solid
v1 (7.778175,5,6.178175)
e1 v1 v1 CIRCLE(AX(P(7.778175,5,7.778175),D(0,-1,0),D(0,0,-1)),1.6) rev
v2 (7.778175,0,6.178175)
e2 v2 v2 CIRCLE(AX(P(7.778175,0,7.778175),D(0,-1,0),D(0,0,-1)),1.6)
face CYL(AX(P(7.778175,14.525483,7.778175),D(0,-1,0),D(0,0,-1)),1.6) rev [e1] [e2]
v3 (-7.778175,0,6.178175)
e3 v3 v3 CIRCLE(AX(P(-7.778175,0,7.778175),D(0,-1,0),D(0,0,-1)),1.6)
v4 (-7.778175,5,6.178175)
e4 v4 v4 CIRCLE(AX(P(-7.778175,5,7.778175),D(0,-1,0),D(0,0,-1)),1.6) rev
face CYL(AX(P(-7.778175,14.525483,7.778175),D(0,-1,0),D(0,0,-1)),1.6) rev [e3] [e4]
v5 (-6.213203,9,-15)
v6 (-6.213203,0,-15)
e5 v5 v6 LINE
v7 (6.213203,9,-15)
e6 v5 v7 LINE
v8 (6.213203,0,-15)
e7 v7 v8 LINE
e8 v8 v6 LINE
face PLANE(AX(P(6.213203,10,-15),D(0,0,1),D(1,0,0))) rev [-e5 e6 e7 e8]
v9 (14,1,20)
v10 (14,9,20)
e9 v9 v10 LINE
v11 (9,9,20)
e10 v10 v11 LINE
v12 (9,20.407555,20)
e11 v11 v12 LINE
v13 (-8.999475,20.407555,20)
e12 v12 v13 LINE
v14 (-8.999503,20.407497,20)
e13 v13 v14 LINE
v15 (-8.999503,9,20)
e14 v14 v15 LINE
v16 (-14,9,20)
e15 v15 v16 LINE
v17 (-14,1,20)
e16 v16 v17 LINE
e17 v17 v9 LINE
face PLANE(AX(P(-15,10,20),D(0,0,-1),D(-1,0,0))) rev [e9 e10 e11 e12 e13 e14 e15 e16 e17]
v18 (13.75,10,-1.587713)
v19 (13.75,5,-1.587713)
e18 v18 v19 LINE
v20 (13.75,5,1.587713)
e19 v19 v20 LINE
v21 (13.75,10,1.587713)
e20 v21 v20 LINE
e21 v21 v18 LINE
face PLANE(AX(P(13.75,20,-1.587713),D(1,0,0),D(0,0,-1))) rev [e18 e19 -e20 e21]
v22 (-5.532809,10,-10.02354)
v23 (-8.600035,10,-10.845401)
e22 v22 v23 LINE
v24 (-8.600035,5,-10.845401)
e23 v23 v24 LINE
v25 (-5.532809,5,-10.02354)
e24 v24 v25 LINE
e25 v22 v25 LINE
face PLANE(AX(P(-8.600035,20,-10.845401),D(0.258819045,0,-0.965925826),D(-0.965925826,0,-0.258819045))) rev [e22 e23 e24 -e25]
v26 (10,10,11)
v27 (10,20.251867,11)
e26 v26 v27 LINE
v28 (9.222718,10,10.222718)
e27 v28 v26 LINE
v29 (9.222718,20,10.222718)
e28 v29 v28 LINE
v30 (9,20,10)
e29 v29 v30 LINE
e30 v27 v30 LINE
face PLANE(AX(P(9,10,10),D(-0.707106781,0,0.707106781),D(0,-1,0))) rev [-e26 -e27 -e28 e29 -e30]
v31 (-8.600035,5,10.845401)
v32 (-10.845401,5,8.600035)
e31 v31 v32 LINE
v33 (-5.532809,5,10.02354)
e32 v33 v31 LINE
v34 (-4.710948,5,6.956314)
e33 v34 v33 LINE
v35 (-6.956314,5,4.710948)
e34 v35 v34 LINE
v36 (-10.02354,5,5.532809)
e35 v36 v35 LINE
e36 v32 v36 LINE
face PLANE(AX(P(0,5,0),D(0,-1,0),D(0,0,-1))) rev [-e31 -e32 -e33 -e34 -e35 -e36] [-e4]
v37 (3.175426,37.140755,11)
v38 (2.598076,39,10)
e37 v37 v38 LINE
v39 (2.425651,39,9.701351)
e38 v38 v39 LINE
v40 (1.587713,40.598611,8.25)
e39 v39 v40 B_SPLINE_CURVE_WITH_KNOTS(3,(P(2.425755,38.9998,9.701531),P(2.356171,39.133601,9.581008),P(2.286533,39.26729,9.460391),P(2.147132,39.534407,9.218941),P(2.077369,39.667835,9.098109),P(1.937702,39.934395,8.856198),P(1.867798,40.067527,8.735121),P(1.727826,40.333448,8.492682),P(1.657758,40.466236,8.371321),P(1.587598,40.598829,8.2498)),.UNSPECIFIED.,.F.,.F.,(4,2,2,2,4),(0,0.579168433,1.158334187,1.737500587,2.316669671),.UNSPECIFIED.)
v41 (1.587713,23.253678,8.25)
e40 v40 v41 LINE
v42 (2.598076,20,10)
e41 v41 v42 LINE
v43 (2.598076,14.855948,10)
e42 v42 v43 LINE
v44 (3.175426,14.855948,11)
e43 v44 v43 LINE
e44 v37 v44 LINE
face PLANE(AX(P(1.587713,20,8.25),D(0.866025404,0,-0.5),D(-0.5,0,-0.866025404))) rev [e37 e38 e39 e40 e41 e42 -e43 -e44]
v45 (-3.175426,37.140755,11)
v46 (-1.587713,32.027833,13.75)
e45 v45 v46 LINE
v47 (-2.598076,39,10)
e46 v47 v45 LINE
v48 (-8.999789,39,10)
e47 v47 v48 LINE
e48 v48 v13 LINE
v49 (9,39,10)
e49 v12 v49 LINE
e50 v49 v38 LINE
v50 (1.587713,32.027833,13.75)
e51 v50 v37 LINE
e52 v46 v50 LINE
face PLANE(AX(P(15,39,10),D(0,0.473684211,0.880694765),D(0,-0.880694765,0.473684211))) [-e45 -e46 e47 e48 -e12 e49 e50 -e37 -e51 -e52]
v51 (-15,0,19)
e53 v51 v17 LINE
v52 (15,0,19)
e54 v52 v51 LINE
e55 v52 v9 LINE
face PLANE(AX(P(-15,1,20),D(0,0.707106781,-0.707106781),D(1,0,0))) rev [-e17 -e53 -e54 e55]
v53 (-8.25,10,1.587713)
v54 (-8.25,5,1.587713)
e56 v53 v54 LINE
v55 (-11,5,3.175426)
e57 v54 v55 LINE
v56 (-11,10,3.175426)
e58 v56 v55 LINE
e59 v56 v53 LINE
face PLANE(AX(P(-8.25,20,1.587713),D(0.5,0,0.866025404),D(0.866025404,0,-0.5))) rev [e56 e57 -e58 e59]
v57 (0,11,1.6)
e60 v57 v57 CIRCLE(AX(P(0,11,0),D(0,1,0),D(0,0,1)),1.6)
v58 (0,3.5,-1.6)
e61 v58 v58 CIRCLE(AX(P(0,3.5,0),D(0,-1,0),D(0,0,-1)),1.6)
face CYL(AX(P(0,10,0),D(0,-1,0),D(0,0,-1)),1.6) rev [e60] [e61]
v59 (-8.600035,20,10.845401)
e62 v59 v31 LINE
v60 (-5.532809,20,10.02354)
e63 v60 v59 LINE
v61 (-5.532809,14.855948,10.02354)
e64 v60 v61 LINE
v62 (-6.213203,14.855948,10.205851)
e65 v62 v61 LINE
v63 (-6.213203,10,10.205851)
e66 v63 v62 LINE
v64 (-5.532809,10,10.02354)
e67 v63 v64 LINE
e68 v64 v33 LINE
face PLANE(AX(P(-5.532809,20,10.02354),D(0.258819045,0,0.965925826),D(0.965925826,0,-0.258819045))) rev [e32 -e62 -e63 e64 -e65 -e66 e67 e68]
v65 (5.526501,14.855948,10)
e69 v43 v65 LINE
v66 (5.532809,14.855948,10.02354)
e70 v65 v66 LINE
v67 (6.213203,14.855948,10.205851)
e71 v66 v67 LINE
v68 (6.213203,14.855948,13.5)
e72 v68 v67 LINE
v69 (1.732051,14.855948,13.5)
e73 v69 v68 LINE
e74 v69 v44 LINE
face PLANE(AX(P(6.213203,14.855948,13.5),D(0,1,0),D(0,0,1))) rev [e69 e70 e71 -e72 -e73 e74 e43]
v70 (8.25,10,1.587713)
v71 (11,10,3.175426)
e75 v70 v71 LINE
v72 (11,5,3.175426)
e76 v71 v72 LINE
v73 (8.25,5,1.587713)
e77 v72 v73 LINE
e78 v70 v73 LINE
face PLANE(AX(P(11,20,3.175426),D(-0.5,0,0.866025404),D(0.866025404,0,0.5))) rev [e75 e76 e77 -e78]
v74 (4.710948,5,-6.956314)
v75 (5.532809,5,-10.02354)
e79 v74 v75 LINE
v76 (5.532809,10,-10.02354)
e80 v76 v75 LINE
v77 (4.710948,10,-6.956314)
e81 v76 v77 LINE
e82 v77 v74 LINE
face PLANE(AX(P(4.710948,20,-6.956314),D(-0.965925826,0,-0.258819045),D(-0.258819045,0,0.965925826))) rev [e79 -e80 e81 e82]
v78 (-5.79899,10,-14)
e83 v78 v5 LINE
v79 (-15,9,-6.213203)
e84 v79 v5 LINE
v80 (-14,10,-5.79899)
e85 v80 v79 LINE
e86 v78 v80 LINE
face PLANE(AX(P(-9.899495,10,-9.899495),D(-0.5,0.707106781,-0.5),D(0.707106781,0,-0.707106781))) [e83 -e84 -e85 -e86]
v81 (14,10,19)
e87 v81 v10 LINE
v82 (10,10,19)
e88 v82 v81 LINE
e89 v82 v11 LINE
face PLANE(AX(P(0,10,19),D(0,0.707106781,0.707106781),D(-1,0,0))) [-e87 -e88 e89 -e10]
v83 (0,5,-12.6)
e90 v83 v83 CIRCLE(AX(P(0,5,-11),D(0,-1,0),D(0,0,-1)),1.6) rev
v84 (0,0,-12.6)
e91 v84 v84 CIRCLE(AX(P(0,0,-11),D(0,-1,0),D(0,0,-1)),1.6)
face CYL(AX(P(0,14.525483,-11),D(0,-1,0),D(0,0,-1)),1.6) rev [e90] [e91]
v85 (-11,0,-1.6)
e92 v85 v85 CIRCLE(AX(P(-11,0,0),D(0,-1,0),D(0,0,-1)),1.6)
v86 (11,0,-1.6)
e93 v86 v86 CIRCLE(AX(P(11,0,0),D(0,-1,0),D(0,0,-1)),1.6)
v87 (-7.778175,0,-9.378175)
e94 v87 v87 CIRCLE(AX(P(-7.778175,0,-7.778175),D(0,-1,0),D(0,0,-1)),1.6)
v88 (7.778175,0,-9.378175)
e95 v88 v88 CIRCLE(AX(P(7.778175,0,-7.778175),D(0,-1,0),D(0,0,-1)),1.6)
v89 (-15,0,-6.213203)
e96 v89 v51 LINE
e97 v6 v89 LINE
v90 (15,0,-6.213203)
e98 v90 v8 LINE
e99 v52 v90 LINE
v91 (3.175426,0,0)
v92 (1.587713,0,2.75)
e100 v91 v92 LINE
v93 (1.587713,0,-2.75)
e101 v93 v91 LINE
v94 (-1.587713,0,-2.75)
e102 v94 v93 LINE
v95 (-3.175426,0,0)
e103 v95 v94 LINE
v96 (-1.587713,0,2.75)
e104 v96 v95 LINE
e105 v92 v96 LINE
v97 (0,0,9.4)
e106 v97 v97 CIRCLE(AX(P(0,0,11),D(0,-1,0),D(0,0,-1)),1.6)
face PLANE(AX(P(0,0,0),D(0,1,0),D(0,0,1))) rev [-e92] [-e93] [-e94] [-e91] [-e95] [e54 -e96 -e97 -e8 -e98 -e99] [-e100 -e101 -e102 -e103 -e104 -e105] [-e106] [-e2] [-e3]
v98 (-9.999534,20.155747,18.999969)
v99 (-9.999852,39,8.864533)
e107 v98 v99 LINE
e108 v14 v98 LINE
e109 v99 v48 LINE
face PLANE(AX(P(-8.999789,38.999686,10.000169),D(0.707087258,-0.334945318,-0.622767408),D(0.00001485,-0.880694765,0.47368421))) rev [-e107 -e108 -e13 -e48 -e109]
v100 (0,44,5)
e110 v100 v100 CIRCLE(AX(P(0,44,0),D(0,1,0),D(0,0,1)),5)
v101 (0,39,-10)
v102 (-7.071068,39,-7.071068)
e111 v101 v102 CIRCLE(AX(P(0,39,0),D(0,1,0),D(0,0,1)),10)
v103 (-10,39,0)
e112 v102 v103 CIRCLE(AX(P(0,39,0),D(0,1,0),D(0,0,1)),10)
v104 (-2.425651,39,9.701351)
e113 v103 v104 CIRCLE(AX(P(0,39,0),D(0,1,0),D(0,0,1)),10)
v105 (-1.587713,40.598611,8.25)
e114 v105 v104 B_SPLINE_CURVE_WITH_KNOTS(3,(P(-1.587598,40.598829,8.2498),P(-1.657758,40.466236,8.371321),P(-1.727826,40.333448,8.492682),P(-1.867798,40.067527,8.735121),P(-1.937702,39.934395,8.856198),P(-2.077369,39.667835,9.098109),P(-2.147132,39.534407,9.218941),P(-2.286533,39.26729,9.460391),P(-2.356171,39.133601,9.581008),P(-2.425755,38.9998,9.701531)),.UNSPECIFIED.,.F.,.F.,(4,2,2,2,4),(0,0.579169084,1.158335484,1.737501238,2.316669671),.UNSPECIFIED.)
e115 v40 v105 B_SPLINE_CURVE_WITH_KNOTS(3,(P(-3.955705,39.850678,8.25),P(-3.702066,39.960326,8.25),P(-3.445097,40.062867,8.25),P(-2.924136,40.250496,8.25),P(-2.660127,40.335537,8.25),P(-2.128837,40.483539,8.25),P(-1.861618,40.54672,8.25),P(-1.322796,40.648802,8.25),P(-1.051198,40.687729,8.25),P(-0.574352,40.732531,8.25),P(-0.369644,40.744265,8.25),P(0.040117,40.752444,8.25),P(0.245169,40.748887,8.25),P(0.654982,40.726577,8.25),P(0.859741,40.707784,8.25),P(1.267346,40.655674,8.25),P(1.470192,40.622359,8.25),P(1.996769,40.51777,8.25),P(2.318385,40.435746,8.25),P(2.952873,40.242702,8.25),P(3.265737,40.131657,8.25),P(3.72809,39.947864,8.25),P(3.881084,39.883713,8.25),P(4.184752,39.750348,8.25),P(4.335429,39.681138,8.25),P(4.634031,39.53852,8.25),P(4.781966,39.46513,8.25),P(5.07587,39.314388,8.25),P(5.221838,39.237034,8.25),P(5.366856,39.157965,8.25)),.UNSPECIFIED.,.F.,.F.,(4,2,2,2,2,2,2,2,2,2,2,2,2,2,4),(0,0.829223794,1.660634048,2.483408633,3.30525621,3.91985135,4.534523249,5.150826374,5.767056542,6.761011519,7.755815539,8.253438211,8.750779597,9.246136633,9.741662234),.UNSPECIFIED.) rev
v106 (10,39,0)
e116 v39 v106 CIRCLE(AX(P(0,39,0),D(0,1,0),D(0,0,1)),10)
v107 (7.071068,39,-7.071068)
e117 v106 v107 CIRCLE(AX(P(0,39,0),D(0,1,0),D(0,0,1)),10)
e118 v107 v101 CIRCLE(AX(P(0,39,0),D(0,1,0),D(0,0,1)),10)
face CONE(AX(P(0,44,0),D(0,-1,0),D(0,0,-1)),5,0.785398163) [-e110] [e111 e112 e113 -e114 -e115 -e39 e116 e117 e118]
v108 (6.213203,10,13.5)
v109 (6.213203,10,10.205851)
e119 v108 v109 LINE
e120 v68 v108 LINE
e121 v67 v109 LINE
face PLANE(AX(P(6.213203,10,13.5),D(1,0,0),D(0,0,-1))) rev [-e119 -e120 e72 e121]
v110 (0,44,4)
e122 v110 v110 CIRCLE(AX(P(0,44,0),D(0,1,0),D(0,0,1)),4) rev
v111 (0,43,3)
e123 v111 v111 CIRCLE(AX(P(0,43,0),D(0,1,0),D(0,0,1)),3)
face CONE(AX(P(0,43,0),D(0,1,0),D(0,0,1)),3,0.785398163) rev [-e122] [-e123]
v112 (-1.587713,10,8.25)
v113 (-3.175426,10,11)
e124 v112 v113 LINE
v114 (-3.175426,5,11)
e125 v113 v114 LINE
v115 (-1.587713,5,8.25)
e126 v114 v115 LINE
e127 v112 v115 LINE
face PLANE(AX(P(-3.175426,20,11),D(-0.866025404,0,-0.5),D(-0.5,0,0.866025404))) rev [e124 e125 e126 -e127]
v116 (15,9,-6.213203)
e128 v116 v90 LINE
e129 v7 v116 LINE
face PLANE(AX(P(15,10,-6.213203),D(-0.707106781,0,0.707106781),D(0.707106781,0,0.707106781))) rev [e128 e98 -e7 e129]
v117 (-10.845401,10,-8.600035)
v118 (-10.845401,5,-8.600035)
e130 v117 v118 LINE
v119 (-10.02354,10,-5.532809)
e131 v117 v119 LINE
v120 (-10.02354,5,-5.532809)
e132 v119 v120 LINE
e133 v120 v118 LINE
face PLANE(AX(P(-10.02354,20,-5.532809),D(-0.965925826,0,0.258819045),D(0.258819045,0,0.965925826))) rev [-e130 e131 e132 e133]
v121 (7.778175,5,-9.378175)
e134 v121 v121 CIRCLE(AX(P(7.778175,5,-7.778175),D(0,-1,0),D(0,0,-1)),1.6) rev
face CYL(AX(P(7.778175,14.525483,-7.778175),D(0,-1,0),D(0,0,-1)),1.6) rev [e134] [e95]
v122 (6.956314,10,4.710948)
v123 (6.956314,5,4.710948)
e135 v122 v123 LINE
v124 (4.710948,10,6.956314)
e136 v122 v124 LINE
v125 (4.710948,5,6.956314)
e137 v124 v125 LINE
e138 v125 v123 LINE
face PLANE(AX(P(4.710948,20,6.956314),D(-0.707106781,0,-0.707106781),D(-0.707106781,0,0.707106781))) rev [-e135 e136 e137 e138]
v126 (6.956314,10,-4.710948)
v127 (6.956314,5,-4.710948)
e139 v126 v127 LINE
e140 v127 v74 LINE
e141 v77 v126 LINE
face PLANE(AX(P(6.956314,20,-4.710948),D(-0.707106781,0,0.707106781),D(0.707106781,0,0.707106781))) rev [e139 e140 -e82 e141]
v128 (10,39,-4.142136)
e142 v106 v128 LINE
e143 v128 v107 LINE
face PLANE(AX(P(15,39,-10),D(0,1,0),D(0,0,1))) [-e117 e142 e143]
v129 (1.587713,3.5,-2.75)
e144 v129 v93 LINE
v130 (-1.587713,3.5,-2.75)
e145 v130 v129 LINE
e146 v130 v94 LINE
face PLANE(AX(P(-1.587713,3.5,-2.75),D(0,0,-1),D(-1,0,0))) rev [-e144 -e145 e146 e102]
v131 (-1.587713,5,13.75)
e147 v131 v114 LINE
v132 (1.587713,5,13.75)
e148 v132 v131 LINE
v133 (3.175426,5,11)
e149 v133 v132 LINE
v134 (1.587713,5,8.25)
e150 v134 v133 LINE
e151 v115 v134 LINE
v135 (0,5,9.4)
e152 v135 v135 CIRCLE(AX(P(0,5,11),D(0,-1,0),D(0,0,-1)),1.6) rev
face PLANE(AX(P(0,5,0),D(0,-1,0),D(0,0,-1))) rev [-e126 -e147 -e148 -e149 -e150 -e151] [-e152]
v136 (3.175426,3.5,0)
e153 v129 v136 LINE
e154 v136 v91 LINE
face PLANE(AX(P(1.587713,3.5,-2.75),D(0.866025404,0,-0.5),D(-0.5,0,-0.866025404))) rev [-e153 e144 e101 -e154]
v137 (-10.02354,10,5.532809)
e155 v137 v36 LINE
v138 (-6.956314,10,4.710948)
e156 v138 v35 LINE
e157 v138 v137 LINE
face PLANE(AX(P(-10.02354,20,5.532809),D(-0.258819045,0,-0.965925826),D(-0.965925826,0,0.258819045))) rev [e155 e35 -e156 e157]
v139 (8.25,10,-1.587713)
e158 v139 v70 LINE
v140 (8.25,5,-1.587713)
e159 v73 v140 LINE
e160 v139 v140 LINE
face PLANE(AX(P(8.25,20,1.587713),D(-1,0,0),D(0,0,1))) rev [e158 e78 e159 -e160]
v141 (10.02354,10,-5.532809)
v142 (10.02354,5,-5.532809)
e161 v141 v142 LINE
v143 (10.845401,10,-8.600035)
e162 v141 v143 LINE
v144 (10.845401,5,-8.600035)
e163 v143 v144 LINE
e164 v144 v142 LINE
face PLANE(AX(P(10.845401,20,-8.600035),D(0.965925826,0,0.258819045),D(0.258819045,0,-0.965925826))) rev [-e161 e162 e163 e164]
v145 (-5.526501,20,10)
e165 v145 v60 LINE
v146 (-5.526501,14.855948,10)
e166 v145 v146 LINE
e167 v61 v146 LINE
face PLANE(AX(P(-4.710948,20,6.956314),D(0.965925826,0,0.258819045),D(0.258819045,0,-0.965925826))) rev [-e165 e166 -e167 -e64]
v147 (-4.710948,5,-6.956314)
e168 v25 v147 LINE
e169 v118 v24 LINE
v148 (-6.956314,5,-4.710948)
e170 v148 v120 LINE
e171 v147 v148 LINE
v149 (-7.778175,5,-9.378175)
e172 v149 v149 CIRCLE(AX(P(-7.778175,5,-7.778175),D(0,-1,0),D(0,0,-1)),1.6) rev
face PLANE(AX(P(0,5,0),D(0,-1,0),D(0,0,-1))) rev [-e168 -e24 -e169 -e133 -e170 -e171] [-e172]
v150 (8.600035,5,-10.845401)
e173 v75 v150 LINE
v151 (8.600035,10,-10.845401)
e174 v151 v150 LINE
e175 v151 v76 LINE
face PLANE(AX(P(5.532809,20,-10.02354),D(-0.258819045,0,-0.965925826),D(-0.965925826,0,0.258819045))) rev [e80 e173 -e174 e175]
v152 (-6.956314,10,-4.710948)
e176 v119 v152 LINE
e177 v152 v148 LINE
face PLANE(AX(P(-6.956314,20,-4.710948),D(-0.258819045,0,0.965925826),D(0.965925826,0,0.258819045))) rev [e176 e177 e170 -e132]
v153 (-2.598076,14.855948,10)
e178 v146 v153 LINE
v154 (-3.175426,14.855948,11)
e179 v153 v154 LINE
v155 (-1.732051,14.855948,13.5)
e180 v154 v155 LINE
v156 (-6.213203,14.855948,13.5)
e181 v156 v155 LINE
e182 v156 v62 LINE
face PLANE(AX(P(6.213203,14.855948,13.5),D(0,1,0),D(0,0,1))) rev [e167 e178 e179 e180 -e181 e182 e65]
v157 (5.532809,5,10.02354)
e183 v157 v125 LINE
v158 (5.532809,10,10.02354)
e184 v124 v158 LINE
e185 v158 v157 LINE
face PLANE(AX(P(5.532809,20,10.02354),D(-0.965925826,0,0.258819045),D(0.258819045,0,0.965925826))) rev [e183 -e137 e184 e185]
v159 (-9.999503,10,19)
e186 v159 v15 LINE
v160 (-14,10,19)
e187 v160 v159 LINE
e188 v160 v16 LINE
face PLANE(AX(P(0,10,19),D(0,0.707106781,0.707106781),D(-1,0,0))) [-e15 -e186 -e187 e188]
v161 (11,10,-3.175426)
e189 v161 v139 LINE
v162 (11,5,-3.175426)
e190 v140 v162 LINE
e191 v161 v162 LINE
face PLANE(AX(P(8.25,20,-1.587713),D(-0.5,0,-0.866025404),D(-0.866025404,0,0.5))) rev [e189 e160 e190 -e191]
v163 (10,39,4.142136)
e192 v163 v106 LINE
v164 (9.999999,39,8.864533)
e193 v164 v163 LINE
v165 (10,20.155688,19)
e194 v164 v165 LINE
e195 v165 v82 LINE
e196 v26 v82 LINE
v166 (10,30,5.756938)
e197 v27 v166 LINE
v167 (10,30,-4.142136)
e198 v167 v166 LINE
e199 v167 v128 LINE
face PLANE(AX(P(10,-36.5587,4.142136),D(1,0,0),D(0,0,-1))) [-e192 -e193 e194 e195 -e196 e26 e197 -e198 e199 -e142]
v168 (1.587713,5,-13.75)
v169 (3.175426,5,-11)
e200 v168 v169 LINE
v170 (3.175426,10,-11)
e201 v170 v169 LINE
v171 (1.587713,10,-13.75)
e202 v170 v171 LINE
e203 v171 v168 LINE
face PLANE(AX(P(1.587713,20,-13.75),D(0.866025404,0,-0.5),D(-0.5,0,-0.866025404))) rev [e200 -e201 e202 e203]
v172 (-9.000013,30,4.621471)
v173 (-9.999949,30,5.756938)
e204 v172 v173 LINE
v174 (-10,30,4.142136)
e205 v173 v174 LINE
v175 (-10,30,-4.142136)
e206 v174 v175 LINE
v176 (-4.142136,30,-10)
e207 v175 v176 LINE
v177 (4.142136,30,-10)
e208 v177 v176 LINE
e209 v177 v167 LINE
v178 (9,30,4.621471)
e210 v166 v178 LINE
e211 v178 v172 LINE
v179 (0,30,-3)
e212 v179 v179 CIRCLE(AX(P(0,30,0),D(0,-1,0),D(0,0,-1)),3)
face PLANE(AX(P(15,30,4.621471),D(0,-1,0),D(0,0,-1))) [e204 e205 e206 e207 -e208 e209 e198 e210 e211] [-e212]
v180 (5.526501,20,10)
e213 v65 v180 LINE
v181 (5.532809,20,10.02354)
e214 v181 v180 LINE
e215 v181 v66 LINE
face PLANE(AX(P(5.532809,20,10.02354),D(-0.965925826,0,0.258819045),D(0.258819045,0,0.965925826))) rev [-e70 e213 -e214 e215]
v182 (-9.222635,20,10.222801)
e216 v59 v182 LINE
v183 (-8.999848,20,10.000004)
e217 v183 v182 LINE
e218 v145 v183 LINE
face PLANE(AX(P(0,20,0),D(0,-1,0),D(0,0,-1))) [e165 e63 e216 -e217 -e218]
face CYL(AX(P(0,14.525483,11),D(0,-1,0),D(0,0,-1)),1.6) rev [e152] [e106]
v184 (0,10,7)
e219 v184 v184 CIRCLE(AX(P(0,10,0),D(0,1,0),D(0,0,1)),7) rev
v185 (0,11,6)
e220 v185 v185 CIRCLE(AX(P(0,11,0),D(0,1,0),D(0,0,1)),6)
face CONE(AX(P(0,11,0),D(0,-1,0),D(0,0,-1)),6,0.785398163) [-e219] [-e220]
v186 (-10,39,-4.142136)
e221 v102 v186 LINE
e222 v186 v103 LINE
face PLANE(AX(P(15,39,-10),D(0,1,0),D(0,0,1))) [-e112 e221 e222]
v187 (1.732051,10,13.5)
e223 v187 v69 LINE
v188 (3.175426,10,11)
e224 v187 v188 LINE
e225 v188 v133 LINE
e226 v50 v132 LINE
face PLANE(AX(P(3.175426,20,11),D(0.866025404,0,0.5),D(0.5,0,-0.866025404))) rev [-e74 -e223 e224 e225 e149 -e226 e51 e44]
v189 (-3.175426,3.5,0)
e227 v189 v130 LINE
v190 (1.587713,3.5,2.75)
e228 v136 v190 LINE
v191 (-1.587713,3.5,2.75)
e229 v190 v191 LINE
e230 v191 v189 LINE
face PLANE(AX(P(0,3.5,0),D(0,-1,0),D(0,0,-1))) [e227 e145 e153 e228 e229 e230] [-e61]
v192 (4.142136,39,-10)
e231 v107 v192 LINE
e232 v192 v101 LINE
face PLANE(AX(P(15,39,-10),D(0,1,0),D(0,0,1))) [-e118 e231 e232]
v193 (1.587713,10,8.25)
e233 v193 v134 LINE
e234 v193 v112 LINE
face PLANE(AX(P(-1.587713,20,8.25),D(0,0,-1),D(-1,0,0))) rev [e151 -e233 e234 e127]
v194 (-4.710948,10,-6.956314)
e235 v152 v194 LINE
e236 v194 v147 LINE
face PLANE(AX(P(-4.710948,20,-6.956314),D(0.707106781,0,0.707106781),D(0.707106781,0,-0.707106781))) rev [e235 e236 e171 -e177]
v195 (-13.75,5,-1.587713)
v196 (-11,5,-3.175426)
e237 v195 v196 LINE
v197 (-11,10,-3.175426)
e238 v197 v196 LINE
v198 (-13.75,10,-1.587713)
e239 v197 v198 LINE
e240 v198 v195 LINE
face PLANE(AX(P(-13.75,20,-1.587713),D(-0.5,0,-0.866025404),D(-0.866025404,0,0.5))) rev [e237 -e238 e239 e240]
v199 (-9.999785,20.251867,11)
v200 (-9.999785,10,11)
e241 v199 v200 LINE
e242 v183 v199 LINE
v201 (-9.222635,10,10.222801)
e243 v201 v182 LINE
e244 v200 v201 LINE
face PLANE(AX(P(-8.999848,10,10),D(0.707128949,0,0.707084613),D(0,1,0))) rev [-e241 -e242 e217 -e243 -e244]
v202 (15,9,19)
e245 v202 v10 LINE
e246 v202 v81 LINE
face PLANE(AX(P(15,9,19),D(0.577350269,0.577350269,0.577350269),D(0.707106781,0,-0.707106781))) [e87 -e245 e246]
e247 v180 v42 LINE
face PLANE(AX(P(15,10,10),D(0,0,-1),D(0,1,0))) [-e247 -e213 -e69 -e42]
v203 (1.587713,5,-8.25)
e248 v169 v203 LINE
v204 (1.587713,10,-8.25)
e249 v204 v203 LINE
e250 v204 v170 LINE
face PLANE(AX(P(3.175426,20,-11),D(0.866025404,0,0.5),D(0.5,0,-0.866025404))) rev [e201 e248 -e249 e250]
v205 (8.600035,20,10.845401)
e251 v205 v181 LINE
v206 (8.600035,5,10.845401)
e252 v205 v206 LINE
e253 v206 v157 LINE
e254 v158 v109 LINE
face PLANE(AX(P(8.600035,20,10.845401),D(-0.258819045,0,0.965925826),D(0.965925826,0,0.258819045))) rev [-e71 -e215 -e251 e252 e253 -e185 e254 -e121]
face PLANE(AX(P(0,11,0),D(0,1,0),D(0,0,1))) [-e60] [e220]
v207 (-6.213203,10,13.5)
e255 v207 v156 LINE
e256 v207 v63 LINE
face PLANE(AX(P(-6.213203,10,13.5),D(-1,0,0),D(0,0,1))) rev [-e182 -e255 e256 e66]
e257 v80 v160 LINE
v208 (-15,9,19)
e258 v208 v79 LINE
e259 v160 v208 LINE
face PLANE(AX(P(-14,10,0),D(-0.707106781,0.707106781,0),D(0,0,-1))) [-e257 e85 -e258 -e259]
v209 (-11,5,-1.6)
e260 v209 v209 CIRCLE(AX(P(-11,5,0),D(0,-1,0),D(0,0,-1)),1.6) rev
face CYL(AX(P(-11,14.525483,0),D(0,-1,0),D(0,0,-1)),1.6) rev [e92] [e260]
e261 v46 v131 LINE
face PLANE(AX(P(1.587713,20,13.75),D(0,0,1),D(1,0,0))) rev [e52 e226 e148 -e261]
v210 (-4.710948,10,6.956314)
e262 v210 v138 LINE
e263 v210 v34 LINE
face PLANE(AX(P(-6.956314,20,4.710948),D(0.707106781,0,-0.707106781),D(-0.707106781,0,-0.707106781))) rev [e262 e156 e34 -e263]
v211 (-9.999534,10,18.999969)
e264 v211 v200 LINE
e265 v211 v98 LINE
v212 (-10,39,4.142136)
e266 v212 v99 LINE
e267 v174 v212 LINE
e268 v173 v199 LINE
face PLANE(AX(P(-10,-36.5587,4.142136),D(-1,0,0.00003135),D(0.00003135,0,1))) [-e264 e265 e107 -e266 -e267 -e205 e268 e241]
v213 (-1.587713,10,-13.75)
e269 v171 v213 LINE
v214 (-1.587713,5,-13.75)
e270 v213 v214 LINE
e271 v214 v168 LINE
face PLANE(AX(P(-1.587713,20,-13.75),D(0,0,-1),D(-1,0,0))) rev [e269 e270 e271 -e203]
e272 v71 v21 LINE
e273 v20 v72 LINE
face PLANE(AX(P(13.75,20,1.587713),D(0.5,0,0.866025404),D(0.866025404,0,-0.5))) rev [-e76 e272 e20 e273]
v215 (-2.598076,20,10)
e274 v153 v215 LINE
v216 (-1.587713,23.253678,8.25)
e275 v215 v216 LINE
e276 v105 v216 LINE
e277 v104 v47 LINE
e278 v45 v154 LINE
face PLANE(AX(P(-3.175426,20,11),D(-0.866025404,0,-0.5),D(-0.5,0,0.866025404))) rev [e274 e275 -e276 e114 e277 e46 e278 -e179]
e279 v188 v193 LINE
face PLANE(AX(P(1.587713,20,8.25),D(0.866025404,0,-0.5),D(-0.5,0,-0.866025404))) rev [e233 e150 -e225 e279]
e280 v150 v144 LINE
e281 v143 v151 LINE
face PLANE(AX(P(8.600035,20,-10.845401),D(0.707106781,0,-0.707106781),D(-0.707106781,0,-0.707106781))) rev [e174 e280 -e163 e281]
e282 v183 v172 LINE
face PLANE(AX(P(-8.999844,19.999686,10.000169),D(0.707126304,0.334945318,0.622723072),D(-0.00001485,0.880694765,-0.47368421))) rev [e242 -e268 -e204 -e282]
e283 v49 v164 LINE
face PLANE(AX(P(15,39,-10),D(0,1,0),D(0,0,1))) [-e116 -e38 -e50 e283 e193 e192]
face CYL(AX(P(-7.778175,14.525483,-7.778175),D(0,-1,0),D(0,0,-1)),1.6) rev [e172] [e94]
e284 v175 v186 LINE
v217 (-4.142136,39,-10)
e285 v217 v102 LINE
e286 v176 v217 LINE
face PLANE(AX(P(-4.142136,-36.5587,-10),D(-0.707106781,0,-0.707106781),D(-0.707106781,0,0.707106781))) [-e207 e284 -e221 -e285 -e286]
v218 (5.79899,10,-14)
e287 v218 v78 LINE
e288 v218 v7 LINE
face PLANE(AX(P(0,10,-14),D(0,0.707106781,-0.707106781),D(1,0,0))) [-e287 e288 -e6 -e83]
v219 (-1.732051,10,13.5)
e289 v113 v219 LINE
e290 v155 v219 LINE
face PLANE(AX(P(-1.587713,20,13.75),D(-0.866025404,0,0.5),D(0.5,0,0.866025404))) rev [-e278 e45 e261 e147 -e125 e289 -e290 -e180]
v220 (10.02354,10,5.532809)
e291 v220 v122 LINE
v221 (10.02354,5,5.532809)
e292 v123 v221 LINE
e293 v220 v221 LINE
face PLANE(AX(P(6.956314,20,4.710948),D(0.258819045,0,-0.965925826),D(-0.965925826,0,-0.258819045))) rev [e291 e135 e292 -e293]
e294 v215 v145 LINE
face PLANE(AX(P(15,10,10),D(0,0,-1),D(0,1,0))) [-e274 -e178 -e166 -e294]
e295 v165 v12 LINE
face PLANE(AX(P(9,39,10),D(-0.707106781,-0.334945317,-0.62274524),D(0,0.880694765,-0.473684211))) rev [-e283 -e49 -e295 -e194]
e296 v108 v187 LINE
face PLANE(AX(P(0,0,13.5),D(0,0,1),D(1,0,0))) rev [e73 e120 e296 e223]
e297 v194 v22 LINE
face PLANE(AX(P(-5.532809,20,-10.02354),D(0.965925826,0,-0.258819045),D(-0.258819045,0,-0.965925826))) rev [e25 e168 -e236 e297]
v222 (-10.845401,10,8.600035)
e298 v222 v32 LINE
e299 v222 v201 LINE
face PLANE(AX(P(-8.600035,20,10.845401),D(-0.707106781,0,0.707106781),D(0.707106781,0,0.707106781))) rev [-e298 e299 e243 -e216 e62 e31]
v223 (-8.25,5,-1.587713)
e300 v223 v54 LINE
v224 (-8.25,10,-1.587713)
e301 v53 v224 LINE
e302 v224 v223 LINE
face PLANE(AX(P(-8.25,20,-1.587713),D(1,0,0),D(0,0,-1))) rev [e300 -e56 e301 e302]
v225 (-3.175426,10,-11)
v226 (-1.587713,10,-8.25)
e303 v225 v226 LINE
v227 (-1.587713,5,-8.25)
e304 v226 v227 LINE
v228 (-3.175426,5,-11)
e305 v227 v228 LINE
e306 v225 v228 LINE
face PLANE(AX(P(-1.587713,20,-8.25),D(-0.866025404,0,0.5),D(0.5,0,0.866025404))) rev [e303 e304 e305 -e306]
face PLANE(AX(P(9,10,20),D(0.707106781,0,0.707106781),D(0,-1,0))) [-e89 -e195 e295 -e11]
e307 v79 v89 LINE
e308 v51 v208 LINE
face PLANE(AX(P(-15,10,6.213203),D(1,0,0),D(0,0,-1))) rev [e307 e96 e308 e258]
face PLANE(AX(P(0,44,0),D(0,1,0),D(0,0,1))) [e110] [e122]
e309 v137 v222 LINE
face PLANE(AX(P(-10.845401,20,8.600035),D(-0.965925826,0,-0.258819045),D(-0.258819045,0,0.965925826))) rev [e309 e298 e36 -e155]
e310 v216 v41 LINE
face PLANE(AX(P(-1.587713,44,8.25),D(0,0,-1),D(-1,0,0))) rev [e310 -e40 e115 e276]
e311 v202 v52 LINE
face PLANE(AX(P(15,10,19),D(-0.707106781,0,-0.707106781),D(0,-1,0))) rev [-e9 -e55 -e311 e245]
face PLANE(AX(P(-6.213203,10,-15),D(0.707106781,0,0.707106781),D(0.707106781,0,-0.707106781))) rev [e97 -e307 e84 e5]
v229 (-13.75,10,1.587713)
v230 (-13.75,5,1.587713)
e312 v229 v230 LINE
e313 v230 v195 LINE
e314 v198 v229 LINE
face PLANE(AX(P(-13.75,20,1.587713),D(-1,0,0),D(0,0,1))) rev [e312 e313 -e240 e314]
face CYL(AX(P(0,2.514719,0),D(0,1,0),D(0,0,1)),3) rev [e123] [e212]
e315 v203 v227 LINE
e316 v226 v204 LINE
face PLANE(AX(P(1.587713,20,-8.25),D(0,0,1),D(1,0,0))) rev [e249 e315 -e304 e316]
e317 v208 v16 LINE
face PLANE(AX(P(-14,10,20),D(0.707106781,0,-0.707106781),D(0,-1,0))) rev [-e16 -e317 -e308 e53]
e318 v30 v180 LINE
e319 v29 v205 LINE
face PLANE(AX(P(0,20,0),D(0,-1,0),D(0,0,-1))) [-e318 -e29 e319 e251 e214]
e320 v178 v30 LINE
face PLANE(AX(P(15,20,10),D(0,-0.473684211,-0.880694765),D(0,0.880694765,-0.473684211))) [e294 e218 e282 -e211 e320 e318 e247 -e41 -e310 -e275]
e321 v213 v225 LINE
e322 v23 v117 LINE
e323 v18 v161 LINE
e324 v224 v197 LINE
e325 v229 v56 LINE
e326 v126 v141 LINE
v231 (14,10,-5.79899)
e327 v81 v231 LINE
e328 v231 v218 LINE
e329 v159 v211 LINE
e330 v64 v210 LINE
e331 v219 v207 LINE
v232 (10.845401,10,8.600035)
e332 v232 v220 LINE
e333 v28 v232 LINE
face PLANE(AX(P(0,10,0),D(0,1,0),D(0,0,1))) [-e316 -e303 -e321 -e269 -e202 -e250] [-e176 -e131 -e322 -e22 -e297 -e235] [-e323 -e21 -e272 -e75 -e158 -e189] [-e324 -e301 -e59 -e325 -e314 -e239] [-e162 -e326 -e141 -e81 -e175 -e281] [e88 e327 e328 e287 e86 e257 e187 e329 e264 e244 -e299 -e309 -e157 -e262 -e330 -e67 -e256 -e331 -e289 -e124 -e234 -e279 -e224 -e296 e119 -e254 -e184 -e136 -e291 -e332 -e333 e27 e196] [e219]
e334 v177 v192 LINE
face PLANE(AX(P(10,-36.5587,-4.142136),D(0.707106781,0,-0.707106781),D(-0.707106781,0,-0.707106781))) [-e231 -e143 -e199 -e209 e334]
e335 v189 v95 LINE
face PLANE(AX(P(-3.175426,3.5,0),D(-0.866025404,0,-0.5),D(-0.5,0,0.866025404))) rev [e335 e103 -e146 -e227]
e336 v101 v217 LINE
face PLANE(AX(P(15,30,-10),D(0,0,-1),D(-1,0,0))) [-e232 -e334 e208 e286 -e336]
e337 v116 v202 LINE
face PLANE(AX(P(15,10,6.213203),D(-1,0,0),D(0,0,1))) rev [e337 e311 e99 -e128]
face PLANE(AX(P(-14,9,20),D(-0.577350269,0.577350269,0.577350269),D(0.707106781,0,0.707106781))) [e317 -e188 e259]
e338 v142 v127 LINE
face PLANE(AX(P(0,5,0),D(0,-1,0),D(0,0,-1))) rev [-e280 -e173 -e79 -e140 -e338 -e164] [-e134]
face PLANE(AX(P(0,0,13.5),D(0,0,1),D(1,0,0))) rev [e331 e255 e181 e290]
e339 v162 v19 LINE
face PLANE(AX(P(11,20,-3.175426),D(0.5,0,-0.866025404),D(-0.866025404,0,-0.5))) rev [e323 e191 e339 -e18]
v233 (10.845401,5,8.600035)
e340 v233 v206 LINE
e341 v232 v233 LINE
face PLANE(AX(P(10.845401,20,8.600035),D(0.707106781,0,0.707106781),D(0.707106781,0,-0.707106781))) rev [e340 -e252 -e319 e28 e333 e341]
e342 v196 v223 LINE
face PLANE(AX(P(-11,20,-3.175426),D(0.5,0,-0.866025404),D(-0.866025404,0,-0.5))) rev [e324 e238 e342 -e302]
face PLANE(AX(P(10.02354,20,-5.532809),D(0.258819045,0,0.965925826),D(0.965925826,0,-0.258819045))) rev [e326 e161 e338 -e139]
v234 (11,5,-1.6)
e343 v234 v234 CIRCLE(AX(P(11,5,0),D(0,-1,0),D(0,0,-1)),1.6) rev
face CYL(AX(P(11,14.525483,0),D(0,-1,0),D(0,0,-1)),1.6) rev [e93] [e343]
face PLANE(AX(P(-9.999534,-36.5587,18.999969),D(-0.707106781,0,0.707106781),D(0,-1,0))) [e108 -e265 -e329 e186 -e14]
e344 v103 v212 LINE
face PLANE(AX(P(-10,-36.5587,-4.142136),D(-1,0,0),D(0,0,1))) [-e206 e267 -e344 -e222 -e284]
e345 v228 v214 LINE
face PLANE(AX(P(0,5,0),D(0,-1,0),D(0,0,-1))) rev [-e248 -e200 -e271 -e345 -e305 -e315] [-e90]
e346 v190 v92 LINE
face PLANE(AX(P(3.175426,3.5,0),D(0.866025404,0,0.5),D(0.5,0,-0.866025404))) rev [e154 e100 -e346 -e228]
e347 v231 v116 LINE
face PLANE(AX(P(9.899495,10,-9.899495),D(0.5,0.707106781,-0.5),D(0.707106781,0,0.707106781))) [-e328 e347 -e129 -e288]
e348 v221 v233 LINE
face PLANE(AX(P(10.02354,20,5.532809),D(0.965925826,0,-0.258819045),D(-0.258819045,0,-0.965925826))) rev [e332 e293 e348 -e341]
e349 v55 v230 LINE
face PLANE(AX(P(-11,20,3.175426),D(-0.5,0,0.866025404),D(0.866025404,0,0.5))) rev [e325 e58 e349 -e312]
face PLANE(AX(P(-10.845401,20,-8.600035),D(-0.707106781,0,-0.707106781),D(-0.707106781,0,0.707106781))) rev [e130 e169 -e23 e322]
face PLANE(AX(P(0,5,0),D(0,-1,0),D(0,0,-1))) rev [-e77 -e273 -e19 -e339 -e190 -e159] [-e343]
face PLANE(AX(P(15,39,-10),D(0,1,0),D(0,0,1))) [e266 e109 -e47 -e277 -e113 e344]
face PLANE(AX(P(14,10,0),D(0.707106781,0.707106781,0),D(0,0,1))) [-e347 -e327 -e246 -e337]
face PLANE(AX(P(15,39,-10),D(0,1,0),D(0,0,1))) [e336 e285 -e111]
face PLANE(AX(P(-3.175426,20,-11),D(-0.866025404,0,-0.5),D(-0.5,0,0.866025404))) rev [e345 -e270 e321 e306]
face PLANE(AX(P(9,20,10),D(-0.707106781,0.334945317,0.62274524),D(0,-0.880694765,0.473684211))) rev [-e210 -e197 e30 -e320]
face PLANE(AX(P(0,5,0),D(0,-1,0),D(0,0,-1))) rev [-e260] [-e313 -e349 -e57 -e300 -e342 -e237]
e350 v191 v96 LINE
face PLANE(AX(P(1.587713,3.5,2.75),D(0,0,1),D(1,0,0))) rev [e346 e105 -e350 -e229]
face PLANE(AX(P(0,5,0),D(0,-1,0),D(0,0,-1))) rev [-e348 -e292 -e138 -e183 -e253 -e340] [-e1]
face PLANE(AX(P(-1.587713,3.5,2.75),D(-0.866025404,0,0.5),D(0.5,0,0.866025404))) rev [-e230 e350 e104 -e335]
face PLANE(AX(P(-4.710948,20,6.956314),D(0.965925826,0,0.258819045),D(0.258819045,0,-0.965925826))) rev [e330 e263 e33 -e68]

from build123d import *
from OCP.BRepFilletAPI import BRepFilletAPI_MakeChamfer

# Parameters (mm, degrees)
CROQUIS1_R              = 1.6
SALIENTE_EXTRUIR1_DEPTH = 10
SALIENTE_EXTRUIR2_DEPTH = 30
CROQUIS12_W             = 12.426406872
CROQUIS12_H             = 4.855948251
CORTAR_EXTRUIR7_DEPTH   = 3.5
CROQUIS3_OUTSIDE_W      = 44.076
CROQUIS3_OUTSIDE_H      = 49.076
CROQUIS3_OUTSIDE_R      = 1.6
CORTAR_EXTRUIR1_DEPTH   = 29
CROQUIS4_R              = 10
SALIENTE_EXTRUIR3_DEPTH = 5
CHAFL_N1_SIZE           = 5
CROQUIS6_R              = 1.6
CORTAR_EXTRUIR3_DEPTH   = 10
CROQUIS8_R              = 6
CROQUIS8_R_2            = 1.6
SALIENTE_EXTRUIR4_DEPTH = 1
CHAFL_N2_SIZE           = 1
CROQUIS5_R              = 3
CORTAR_EXTRUIR4_DEPTH   = 33
CHAFL_N3_SIZE           = 1
CHAFL_N3_SIZE2          = 1.000027611
CHAFL_N3_SIZE2_2        = 1.000000257
CHAFL_N3_SIZE2_3        = 0.999999743
CHAFL_N3_SIZE2_4        = 0.999999708
CHAFL_N3_SIZE2_5        = 1.000000292
CHAFL_N3_SIZE2_6        = 0.999968652
CHAFL_N3_SIZE2_7        = 0.999972392
CHAFL_N3_SIZE2_8        = 1.000031351
CORTAR_EXTRUIR5_START   = -5
CORTAR_EXTRUIR5_DEPTH   = 15
CORTAR_EXTRUIR8_DEPTH   = 48.759815826
CHAFL_N4_SIZE           = 1
CORTAR_EXTRUIR6_DEPTH   = 3.5


with BuildPart() as part:
    # Croquis1 → Saliente-Extruir1 (new body)
    with BuildSketch(Plane(origin=(0, 0, 0), x_dir=(1, 0, 0), z_dir=(0, 1, 0))):
        Polygon((-15, -6.213203436), (-15, -20), (15, -20), (15, -6.213203436), (15, 6.213203436), (6.213203436, 15), (-6.213203436, 15), (-15, 6.213203436), align=None)
        with Locations(Location((0, 0, 0), (0, 0, 270))):
            Circle(CROQUIS1_R, mode=Mode.SUBTRACT)
    extrude(amount=SALIENTE_EXTRUIR1_DEPTH)

    # Croquis2 → Saliente-Extruir2 (add)
    with BuildSketch(Plane.ZY.offset(15)):
        Polygon((10, 20), (4.621471258, 30), (-10, 30), (-10, 39), (10, 39), (20, 20.407554966), (20, 10), (10, 10), align=None)
    extrude(amount=-SALIENTE_EXTRUIR2_DEPTH)

    # Croquis12 → Cortar-Extruir7 (cut)
    with BuildSketch(Plane(origin=(0, 0, 10), x_dir=(-1, 0, 0), z_dir=(0, 0, -1))):
        with Locations((0, 12.427974126)):
            Rectangle(CROQUIS12_W, CROQUIS12_H)
    extrude(amount=-CORTAR_EXTRUIR7_DEPTH, mode=Mode.SUBTRACT)

    # Croquis3 outside → Cortar-Extruir1 (cut)
    # profile 1 of 2: a face of its own
    with BuildSketch(Plane(origin=(0, 39, 0), x_dir=(1, 0, 0), z_dir=(0, 1, 0))):
        with Locations((0, -2.5)):
            Rectangle(CROQUIS3_OUTSIDE_W, CROQUIS3_OUTSIDE_H)
        Polygon((-10, -4.142135624), (-9.999502859, -20), (9.999995364, -20), (10, -4.142135624), (10, 4.142135624), (4.142135624, 10), (-4.142135624, 10), (-10, 4.142135624), align=None, mode=Mode.SUBTRACT)
    # profile 2 of 2: a face of its own
    with BuildSketch(Plane(origin=(0, 39, 0), x_dir=(1, 0, 0), z_dir=(0, 1, 0))):
        with Locations(Location((0, 0, 0), (0, 0, 270))):
            Circle(CROQUIS3_OUTSIDE_R)
    extrude(amount=-CORTAR_EXTRUIR1_DEPTH, mode=Mode.SUBTRACT)

    # Croquis4 → Saliente-Extruir3 (add)
    with BuildSketch(Plane(origin=(0, 39, 0), x_dir=(1, 0, 0), z_dir=(0, 1, 0))):
        with Locations(Location((0, 0, 0), (0, 0, 270))):
            Circle(CROQUIS4_R)
    extrude(amount=SALIENTE_EXTRUIR3_DEPTH)

    # Chaflán1
    chafl_n1_edges = [part.edges().sort_by_distance(p)[0] for p in [
        (0, 44, -10),
    ]]
    chamfer(chafl_n1_edges, length=CHAFL_N1_SIZE - 0.0001)  # a hair under: the kernel refuses the full size

    # Croquis6 → Cortar-Extruir3 (cut)
    with BuildSketch(Plane.XZ):
        with Locations(Location((0, 11, 0), (0, 0, 270))):
            Circle(CROQUIS6_R)
        with Locations(Location((7.778174593, 7.778174593, 0), (0, 0, 270))):
            Circle(CROQUIS6_R)
        with Locations(Location((11, 0, 0), (0, 0, 270))):
            Circle(CROQUIS6_R)
        with Locations(Location((7.778174593, -7.778174593, 0), (0, 0, 270))):
            Circle(CROQUIS6_R)
        with Locations(Location((0, -11, 0), (0, 0, 270))):
            Circle(CROQUIS6_R)
        with Locations(Location((-7.778174593, -7.778174593, 0), (0, 0, 270))):
            Circle(CROQUIS6_R)
        with Locations(Location((-11, 0, 0), (0, 0, 270))):
            Circle(CROQUIS6_R)
        with Locations(Location((-7.778174593, 7.778174593, 0), (0, 0, 270))):
            Circle(CROQUIS6_R)
    extrude(amount=-CORTAR_EXTRUIR3_DEPTH, mode=Mode.SUBTRACT)

    # Croquis8 → Saliente-Extruir4 (add)
    with BuildSketch(Plane(origin=(0, 10, 0), x_dir=(1, 0, 0), z_dir=(0, 1, 0))):
        with Locations(Location((0, 0, 0), (0, 0, 270))):
            Circle(CROQUIS8_R)
        with Locations(Location((0, 0, 0), (0, 0, 270))):
            Circle(CROQUIS8_R_2, mode=Mode.SUBTRACT)
    extrude(amount=SALIENTE_EXTRUIR4_DEPTH)

    # Chaflán2
    chafl_n2_edges = [part.edges().sort_by_distance(p)[0] for p in [
        (0, 10, -6),
    ]]
    chamfer(chafl_n2_edges, length=CHAFL_N2_SIZE - 0.0001)  # a hair under: the kernel refuses the full size

    # Croquis5 → Cortar-Extruir4 (cut)
    with BuildSketch(Plane(origin=(0, 44, 0), x_dir=(1, 0, 0), z_dir=(0, 1, 0))):
        with Locations(Location((0, 0, 0), (0, 0, 270))):
            Circle(CROQUIS5_R)
    extrude(amount=-CORTAR_EXTRUIR4_DEPTH, mode=Mode.SUBTRACT)

    # Chaflán3: one chamfer whose edges measure the first distance from different faces: ONE call of the kernel's chamfer builder (chamfer() names one face for all edges)
    chafl_n3_edges_1 = [part.edges().sort_by_distance(p)[0] for p in [
        (10.606601718, 10, -10.606601718),
        (0, 10, -15),
        (-10.606601718, 10, -10.606601718),
        (-15, 10, 6.893398282),
        (15, 10, 6.893398282),
        (15, 5, 20),
        (-15, 5, 20),
        (0, 0, 20),
        (-12.499751429, 10, 20),
        (12.499997682, 10, 20),
    ]]
    chafl_n3_edges_2 = [part.edges().sort_by_distance(p)[0] for p in [
        (-9.999659608, 29.703777483, 15),
    ]]
    chafl_n3_side_2 = [part.faces().sort_by_distance(p)[0] for p in [
        (-9.999745235, 23.826424788, 12.268639946),
    ]]
    chafl_n3_edges_3 = [part.edges().sort_by_distance(p)[0] for p in [
        (9.999996825, 29.703777483, 15),
    ]]
    chafl_n3_side_3 = [part.faces().sort_by_distance(p)[0] for p in [
        (9.999997624, 23.826424788, 12.268639946),
    ]]
    chafl_n3_edges_4 = [part.edges().sort_by_distance(p)[0] for p in [
        (9.999999074, 25, 7.310735629),
    ]]
    chafl_n3_side_4 = [part.faces().sort_by_distance(p)[0] for p in [
        (9.999997624, 23.826424788, 12.268639946),
    ]]
    chafl_n3_edges_5 = [part.edges().sort_by_distance(p)[0] for p in [
        (9.999998287, 15, 10),
    ]]
    chafl_n3_side_5 = [part.faces().sort_by_distance(p)[0] for p in [
        (0.000130269, 16.111309081, 10),
    ]]
    chafl_n3_edges_6 = [part.edges().sort_by_distance(p)[0] for p in [
        (9.999995364, 15.203777483, 20),
    ]]
    chafl_n3_side_6 = [part.faces().sort_by_distance(p)[0] for p in [
        (0.00010087, 9.179654523, 20),
    ]]
    chafl_n3_edges_7 = [part.edges().sort_by_distance(p)[0] for p in [
        (-9.999816357, 15, 10),
    ]]
    chafl_n3_side_7 = [part.faces().sort_by_distance(p)[0] for p in [
        (-9.999745235, 23.826424788, 12.268639946),
    ]]
    chafl_n3_edges_8 = [part.edges().sort_by_distance(p)[0] for p in [
        (-9.999900665, 25, 7.310735629),
    ]]
    chafl_n3_side_8 = [part.faces().sort_by_distance(p)[0] for p in [
        (-9.999745235, 23.826424788, 12.268639946),
    ]]
    chafl_n3_edges_9 = [part.edges().sort_by_distance(p)[0] for p in [
        (-9.999502859, 15.203777483, 20),
    ]]
    chafl_n3_side_9 = [part.faces().sort_by_distance(p)[0] for p in [
        (-9.999745235, 23.826424788, 12.268639946),
    ]]
    chafl_n3 = BRepFilletAPI_MakeChamfer(part.part.solid().wrapped)
    for e in chafl_n3_edges_1:
        chafl_n3.Add(CHAFL_N3_SIZE, e.wrapped)
    for e in chafl_n3_edges_2:
        chafl_n3.Add(CHAFL_N3_SIZE, CHAFL_N3_SIZE2, e.wrapped, chafl_n3_side_2[0].wrapped)  # the first distance lies on this face
    for e in chafl_n3_edges_3:
        chafl_n3.Add(CHAFL_N3_SIZE, CHAFL_N3_SIZE2_2, e.wrapped, chafl_n3_side_3[0].wrapped)  # the first distance lies on this face
    for e in chafl_n3_edges_4:
        chafl_n3.Add(CHAFL_N3_SIZE, CHAFL_N3_SIZE2_3, e.wrapped, chafl_n3_side_4[0].wrapped)  # the first distance lies on this face
    for e in chafl_n3_edges_5:
        chafl_n3.Add(CHAFL_N3_SIZE, CHAFL_N3_SIZE2_4, e.wrapped, chafl_n3_side_5[0].wrapped)  # the first distance lies on this face
    for e in chafl_n3_edges_6:
        chafl_n3.Add(CHAFL_N3_SIZE, CHAFL_N3_SIZE2_5, e.wrapped, chafl_n3_side_6[0].wrapped)  # the first distance lies on this face
    for e in chafl_n3_edges_7:
        chafl_n3.Add(CHAFL_N3_SIZE, CHAFL_N3_SIZE2_6, e.wrapped, chafl_n3_side_7[0].wrapped)  # the first distance lies on this face
    for e in chafl_n3_edges_8:
        chafl_n3.Add(CHAFL_N3_SIZE, CHAFL_N3_SIZE2_7, e.wrapped, chafl_n3_side_8[0].wrapped)  # the first distance lies on this face
    for e in chafl_n3_edges_9:
        chafl_n3.Add(CHAFL_N3_SIZE, CHAFL_N3_SIZE2_8, e.wrapped, chafl_n3_side_9[0].wrapped)  # the first distance lies on this face
    add(Compound.cast(chafl_n3.Shape()), mode=Mode.REPLACE)

    # Croquis9 → Cortar-Extruir5 (cut)
    with BuildSketch(Plane.XZ.offset(CORTAR_EXTRUIR5_START)):
        Polygon((-10.023540191, -5.532808996), (-10.84540104, -8.600035443), (-8.600035443, -10.84540104), (-5.532808995, -10.023540191), (-4.710948146, -6.956313744), (-6.956313744, -4.710948146), align=None)
        Polygon((-3.175426481, -11), (-1.58771324, -13.75), (1.58771324, -13.75), (3.175426481, -11), (1.58771324, -8.25), (-1.58771324, -8.25), align=None)
        Polygon((-11, 3.175426481), (-13.75, 1.58771324), (-13.75, -1.58771324), (-11, -3.175426481), (-8.25, -1.58771324), (-8.25, 1.58771324), align=None)
        Polygon((-5.532808996, 10.023540191), (-8.600035443, 10.84540104), (-10.84540104, 8.600035443), (-10.023540191, 5.532808995), (-6.956313744, 4.710948146), (-4.710948146, 6.956313744), align=None)
        Polygon((3.175426481, 11), (1.58771324, 13.75), (-1.58771324, 13.75), (-3.175426481, 11), (-1.58771324, 8.25), (1.58771324, 8.25), align=None)
        Polygon((10.023540191, 5.532808996), (10.84540104, 8.600035443), (8.600035443, 10.84540104), (5.532808995, 10.023540191), (4.710948146, 6.956313744), (6.956313744, 4.710948146), align=None)
        Polygon((11, -3.175426481), (13.75, -1.58771324), (13.75, 1.58771324), (11, 3.175426481), (8.25, 1.58771324), (8.25, -1.58771324), align=None)
        Polygon((5.532808996, -10.023540191), (8.600035443, -10.84540104), (10.84540104, -8.600035443), (10.023540191, -5.532808995), (6.956313744, -4.710948146), (4.710948146, -6.956313744), align=None)
    extrude(amount=-CORTAR_EXTRUIR5_DEPTH, mode=Mode.SUBTRACT)

    # Croquis13 → Cortar-Extruir8 (cut, through all)
    with BuildSketch(Plane(origin=(0, 10, -10), x_dir=(-1, 0, 0), z_dir=(0, -1, 0))):
        Polygon((-3.175426481, -21), (-1.58771324, -23.75), (1.58771324, -23.75), (3.175426481, -21), (1.58771324, -18.25), (-1.58771324, -18.25), align=None)
    extrude(amount=-CORTAR_EXTRUIR8_DEPTH, mode=Mode.SUBTRACT)

    # Chaflán4
    chafl_n4_edges = [part.edges().sort_by_distance(p)[0] for p in [
        (0, 44, -3),
    ]]
    chamfer(chafl_n4_edges, length=CHAFL_N4_SIZE)

    # Croquis10 → Cortar-Extruir6 (cut)
    with BuildSketch(Plane.XZ):
        Polygon((3.175426481, 0), (1.58771324, 2.75), (-1.58771324, 2.75), (-3.175426481, 0), (-1.58771324, -2.75), (1.58771324, -2.75), align=None)
    extrude(amount=-CORTAR_EXTRUIR6_DEPTH, mode=Mode.SUBTRACT)


solid = part.part
